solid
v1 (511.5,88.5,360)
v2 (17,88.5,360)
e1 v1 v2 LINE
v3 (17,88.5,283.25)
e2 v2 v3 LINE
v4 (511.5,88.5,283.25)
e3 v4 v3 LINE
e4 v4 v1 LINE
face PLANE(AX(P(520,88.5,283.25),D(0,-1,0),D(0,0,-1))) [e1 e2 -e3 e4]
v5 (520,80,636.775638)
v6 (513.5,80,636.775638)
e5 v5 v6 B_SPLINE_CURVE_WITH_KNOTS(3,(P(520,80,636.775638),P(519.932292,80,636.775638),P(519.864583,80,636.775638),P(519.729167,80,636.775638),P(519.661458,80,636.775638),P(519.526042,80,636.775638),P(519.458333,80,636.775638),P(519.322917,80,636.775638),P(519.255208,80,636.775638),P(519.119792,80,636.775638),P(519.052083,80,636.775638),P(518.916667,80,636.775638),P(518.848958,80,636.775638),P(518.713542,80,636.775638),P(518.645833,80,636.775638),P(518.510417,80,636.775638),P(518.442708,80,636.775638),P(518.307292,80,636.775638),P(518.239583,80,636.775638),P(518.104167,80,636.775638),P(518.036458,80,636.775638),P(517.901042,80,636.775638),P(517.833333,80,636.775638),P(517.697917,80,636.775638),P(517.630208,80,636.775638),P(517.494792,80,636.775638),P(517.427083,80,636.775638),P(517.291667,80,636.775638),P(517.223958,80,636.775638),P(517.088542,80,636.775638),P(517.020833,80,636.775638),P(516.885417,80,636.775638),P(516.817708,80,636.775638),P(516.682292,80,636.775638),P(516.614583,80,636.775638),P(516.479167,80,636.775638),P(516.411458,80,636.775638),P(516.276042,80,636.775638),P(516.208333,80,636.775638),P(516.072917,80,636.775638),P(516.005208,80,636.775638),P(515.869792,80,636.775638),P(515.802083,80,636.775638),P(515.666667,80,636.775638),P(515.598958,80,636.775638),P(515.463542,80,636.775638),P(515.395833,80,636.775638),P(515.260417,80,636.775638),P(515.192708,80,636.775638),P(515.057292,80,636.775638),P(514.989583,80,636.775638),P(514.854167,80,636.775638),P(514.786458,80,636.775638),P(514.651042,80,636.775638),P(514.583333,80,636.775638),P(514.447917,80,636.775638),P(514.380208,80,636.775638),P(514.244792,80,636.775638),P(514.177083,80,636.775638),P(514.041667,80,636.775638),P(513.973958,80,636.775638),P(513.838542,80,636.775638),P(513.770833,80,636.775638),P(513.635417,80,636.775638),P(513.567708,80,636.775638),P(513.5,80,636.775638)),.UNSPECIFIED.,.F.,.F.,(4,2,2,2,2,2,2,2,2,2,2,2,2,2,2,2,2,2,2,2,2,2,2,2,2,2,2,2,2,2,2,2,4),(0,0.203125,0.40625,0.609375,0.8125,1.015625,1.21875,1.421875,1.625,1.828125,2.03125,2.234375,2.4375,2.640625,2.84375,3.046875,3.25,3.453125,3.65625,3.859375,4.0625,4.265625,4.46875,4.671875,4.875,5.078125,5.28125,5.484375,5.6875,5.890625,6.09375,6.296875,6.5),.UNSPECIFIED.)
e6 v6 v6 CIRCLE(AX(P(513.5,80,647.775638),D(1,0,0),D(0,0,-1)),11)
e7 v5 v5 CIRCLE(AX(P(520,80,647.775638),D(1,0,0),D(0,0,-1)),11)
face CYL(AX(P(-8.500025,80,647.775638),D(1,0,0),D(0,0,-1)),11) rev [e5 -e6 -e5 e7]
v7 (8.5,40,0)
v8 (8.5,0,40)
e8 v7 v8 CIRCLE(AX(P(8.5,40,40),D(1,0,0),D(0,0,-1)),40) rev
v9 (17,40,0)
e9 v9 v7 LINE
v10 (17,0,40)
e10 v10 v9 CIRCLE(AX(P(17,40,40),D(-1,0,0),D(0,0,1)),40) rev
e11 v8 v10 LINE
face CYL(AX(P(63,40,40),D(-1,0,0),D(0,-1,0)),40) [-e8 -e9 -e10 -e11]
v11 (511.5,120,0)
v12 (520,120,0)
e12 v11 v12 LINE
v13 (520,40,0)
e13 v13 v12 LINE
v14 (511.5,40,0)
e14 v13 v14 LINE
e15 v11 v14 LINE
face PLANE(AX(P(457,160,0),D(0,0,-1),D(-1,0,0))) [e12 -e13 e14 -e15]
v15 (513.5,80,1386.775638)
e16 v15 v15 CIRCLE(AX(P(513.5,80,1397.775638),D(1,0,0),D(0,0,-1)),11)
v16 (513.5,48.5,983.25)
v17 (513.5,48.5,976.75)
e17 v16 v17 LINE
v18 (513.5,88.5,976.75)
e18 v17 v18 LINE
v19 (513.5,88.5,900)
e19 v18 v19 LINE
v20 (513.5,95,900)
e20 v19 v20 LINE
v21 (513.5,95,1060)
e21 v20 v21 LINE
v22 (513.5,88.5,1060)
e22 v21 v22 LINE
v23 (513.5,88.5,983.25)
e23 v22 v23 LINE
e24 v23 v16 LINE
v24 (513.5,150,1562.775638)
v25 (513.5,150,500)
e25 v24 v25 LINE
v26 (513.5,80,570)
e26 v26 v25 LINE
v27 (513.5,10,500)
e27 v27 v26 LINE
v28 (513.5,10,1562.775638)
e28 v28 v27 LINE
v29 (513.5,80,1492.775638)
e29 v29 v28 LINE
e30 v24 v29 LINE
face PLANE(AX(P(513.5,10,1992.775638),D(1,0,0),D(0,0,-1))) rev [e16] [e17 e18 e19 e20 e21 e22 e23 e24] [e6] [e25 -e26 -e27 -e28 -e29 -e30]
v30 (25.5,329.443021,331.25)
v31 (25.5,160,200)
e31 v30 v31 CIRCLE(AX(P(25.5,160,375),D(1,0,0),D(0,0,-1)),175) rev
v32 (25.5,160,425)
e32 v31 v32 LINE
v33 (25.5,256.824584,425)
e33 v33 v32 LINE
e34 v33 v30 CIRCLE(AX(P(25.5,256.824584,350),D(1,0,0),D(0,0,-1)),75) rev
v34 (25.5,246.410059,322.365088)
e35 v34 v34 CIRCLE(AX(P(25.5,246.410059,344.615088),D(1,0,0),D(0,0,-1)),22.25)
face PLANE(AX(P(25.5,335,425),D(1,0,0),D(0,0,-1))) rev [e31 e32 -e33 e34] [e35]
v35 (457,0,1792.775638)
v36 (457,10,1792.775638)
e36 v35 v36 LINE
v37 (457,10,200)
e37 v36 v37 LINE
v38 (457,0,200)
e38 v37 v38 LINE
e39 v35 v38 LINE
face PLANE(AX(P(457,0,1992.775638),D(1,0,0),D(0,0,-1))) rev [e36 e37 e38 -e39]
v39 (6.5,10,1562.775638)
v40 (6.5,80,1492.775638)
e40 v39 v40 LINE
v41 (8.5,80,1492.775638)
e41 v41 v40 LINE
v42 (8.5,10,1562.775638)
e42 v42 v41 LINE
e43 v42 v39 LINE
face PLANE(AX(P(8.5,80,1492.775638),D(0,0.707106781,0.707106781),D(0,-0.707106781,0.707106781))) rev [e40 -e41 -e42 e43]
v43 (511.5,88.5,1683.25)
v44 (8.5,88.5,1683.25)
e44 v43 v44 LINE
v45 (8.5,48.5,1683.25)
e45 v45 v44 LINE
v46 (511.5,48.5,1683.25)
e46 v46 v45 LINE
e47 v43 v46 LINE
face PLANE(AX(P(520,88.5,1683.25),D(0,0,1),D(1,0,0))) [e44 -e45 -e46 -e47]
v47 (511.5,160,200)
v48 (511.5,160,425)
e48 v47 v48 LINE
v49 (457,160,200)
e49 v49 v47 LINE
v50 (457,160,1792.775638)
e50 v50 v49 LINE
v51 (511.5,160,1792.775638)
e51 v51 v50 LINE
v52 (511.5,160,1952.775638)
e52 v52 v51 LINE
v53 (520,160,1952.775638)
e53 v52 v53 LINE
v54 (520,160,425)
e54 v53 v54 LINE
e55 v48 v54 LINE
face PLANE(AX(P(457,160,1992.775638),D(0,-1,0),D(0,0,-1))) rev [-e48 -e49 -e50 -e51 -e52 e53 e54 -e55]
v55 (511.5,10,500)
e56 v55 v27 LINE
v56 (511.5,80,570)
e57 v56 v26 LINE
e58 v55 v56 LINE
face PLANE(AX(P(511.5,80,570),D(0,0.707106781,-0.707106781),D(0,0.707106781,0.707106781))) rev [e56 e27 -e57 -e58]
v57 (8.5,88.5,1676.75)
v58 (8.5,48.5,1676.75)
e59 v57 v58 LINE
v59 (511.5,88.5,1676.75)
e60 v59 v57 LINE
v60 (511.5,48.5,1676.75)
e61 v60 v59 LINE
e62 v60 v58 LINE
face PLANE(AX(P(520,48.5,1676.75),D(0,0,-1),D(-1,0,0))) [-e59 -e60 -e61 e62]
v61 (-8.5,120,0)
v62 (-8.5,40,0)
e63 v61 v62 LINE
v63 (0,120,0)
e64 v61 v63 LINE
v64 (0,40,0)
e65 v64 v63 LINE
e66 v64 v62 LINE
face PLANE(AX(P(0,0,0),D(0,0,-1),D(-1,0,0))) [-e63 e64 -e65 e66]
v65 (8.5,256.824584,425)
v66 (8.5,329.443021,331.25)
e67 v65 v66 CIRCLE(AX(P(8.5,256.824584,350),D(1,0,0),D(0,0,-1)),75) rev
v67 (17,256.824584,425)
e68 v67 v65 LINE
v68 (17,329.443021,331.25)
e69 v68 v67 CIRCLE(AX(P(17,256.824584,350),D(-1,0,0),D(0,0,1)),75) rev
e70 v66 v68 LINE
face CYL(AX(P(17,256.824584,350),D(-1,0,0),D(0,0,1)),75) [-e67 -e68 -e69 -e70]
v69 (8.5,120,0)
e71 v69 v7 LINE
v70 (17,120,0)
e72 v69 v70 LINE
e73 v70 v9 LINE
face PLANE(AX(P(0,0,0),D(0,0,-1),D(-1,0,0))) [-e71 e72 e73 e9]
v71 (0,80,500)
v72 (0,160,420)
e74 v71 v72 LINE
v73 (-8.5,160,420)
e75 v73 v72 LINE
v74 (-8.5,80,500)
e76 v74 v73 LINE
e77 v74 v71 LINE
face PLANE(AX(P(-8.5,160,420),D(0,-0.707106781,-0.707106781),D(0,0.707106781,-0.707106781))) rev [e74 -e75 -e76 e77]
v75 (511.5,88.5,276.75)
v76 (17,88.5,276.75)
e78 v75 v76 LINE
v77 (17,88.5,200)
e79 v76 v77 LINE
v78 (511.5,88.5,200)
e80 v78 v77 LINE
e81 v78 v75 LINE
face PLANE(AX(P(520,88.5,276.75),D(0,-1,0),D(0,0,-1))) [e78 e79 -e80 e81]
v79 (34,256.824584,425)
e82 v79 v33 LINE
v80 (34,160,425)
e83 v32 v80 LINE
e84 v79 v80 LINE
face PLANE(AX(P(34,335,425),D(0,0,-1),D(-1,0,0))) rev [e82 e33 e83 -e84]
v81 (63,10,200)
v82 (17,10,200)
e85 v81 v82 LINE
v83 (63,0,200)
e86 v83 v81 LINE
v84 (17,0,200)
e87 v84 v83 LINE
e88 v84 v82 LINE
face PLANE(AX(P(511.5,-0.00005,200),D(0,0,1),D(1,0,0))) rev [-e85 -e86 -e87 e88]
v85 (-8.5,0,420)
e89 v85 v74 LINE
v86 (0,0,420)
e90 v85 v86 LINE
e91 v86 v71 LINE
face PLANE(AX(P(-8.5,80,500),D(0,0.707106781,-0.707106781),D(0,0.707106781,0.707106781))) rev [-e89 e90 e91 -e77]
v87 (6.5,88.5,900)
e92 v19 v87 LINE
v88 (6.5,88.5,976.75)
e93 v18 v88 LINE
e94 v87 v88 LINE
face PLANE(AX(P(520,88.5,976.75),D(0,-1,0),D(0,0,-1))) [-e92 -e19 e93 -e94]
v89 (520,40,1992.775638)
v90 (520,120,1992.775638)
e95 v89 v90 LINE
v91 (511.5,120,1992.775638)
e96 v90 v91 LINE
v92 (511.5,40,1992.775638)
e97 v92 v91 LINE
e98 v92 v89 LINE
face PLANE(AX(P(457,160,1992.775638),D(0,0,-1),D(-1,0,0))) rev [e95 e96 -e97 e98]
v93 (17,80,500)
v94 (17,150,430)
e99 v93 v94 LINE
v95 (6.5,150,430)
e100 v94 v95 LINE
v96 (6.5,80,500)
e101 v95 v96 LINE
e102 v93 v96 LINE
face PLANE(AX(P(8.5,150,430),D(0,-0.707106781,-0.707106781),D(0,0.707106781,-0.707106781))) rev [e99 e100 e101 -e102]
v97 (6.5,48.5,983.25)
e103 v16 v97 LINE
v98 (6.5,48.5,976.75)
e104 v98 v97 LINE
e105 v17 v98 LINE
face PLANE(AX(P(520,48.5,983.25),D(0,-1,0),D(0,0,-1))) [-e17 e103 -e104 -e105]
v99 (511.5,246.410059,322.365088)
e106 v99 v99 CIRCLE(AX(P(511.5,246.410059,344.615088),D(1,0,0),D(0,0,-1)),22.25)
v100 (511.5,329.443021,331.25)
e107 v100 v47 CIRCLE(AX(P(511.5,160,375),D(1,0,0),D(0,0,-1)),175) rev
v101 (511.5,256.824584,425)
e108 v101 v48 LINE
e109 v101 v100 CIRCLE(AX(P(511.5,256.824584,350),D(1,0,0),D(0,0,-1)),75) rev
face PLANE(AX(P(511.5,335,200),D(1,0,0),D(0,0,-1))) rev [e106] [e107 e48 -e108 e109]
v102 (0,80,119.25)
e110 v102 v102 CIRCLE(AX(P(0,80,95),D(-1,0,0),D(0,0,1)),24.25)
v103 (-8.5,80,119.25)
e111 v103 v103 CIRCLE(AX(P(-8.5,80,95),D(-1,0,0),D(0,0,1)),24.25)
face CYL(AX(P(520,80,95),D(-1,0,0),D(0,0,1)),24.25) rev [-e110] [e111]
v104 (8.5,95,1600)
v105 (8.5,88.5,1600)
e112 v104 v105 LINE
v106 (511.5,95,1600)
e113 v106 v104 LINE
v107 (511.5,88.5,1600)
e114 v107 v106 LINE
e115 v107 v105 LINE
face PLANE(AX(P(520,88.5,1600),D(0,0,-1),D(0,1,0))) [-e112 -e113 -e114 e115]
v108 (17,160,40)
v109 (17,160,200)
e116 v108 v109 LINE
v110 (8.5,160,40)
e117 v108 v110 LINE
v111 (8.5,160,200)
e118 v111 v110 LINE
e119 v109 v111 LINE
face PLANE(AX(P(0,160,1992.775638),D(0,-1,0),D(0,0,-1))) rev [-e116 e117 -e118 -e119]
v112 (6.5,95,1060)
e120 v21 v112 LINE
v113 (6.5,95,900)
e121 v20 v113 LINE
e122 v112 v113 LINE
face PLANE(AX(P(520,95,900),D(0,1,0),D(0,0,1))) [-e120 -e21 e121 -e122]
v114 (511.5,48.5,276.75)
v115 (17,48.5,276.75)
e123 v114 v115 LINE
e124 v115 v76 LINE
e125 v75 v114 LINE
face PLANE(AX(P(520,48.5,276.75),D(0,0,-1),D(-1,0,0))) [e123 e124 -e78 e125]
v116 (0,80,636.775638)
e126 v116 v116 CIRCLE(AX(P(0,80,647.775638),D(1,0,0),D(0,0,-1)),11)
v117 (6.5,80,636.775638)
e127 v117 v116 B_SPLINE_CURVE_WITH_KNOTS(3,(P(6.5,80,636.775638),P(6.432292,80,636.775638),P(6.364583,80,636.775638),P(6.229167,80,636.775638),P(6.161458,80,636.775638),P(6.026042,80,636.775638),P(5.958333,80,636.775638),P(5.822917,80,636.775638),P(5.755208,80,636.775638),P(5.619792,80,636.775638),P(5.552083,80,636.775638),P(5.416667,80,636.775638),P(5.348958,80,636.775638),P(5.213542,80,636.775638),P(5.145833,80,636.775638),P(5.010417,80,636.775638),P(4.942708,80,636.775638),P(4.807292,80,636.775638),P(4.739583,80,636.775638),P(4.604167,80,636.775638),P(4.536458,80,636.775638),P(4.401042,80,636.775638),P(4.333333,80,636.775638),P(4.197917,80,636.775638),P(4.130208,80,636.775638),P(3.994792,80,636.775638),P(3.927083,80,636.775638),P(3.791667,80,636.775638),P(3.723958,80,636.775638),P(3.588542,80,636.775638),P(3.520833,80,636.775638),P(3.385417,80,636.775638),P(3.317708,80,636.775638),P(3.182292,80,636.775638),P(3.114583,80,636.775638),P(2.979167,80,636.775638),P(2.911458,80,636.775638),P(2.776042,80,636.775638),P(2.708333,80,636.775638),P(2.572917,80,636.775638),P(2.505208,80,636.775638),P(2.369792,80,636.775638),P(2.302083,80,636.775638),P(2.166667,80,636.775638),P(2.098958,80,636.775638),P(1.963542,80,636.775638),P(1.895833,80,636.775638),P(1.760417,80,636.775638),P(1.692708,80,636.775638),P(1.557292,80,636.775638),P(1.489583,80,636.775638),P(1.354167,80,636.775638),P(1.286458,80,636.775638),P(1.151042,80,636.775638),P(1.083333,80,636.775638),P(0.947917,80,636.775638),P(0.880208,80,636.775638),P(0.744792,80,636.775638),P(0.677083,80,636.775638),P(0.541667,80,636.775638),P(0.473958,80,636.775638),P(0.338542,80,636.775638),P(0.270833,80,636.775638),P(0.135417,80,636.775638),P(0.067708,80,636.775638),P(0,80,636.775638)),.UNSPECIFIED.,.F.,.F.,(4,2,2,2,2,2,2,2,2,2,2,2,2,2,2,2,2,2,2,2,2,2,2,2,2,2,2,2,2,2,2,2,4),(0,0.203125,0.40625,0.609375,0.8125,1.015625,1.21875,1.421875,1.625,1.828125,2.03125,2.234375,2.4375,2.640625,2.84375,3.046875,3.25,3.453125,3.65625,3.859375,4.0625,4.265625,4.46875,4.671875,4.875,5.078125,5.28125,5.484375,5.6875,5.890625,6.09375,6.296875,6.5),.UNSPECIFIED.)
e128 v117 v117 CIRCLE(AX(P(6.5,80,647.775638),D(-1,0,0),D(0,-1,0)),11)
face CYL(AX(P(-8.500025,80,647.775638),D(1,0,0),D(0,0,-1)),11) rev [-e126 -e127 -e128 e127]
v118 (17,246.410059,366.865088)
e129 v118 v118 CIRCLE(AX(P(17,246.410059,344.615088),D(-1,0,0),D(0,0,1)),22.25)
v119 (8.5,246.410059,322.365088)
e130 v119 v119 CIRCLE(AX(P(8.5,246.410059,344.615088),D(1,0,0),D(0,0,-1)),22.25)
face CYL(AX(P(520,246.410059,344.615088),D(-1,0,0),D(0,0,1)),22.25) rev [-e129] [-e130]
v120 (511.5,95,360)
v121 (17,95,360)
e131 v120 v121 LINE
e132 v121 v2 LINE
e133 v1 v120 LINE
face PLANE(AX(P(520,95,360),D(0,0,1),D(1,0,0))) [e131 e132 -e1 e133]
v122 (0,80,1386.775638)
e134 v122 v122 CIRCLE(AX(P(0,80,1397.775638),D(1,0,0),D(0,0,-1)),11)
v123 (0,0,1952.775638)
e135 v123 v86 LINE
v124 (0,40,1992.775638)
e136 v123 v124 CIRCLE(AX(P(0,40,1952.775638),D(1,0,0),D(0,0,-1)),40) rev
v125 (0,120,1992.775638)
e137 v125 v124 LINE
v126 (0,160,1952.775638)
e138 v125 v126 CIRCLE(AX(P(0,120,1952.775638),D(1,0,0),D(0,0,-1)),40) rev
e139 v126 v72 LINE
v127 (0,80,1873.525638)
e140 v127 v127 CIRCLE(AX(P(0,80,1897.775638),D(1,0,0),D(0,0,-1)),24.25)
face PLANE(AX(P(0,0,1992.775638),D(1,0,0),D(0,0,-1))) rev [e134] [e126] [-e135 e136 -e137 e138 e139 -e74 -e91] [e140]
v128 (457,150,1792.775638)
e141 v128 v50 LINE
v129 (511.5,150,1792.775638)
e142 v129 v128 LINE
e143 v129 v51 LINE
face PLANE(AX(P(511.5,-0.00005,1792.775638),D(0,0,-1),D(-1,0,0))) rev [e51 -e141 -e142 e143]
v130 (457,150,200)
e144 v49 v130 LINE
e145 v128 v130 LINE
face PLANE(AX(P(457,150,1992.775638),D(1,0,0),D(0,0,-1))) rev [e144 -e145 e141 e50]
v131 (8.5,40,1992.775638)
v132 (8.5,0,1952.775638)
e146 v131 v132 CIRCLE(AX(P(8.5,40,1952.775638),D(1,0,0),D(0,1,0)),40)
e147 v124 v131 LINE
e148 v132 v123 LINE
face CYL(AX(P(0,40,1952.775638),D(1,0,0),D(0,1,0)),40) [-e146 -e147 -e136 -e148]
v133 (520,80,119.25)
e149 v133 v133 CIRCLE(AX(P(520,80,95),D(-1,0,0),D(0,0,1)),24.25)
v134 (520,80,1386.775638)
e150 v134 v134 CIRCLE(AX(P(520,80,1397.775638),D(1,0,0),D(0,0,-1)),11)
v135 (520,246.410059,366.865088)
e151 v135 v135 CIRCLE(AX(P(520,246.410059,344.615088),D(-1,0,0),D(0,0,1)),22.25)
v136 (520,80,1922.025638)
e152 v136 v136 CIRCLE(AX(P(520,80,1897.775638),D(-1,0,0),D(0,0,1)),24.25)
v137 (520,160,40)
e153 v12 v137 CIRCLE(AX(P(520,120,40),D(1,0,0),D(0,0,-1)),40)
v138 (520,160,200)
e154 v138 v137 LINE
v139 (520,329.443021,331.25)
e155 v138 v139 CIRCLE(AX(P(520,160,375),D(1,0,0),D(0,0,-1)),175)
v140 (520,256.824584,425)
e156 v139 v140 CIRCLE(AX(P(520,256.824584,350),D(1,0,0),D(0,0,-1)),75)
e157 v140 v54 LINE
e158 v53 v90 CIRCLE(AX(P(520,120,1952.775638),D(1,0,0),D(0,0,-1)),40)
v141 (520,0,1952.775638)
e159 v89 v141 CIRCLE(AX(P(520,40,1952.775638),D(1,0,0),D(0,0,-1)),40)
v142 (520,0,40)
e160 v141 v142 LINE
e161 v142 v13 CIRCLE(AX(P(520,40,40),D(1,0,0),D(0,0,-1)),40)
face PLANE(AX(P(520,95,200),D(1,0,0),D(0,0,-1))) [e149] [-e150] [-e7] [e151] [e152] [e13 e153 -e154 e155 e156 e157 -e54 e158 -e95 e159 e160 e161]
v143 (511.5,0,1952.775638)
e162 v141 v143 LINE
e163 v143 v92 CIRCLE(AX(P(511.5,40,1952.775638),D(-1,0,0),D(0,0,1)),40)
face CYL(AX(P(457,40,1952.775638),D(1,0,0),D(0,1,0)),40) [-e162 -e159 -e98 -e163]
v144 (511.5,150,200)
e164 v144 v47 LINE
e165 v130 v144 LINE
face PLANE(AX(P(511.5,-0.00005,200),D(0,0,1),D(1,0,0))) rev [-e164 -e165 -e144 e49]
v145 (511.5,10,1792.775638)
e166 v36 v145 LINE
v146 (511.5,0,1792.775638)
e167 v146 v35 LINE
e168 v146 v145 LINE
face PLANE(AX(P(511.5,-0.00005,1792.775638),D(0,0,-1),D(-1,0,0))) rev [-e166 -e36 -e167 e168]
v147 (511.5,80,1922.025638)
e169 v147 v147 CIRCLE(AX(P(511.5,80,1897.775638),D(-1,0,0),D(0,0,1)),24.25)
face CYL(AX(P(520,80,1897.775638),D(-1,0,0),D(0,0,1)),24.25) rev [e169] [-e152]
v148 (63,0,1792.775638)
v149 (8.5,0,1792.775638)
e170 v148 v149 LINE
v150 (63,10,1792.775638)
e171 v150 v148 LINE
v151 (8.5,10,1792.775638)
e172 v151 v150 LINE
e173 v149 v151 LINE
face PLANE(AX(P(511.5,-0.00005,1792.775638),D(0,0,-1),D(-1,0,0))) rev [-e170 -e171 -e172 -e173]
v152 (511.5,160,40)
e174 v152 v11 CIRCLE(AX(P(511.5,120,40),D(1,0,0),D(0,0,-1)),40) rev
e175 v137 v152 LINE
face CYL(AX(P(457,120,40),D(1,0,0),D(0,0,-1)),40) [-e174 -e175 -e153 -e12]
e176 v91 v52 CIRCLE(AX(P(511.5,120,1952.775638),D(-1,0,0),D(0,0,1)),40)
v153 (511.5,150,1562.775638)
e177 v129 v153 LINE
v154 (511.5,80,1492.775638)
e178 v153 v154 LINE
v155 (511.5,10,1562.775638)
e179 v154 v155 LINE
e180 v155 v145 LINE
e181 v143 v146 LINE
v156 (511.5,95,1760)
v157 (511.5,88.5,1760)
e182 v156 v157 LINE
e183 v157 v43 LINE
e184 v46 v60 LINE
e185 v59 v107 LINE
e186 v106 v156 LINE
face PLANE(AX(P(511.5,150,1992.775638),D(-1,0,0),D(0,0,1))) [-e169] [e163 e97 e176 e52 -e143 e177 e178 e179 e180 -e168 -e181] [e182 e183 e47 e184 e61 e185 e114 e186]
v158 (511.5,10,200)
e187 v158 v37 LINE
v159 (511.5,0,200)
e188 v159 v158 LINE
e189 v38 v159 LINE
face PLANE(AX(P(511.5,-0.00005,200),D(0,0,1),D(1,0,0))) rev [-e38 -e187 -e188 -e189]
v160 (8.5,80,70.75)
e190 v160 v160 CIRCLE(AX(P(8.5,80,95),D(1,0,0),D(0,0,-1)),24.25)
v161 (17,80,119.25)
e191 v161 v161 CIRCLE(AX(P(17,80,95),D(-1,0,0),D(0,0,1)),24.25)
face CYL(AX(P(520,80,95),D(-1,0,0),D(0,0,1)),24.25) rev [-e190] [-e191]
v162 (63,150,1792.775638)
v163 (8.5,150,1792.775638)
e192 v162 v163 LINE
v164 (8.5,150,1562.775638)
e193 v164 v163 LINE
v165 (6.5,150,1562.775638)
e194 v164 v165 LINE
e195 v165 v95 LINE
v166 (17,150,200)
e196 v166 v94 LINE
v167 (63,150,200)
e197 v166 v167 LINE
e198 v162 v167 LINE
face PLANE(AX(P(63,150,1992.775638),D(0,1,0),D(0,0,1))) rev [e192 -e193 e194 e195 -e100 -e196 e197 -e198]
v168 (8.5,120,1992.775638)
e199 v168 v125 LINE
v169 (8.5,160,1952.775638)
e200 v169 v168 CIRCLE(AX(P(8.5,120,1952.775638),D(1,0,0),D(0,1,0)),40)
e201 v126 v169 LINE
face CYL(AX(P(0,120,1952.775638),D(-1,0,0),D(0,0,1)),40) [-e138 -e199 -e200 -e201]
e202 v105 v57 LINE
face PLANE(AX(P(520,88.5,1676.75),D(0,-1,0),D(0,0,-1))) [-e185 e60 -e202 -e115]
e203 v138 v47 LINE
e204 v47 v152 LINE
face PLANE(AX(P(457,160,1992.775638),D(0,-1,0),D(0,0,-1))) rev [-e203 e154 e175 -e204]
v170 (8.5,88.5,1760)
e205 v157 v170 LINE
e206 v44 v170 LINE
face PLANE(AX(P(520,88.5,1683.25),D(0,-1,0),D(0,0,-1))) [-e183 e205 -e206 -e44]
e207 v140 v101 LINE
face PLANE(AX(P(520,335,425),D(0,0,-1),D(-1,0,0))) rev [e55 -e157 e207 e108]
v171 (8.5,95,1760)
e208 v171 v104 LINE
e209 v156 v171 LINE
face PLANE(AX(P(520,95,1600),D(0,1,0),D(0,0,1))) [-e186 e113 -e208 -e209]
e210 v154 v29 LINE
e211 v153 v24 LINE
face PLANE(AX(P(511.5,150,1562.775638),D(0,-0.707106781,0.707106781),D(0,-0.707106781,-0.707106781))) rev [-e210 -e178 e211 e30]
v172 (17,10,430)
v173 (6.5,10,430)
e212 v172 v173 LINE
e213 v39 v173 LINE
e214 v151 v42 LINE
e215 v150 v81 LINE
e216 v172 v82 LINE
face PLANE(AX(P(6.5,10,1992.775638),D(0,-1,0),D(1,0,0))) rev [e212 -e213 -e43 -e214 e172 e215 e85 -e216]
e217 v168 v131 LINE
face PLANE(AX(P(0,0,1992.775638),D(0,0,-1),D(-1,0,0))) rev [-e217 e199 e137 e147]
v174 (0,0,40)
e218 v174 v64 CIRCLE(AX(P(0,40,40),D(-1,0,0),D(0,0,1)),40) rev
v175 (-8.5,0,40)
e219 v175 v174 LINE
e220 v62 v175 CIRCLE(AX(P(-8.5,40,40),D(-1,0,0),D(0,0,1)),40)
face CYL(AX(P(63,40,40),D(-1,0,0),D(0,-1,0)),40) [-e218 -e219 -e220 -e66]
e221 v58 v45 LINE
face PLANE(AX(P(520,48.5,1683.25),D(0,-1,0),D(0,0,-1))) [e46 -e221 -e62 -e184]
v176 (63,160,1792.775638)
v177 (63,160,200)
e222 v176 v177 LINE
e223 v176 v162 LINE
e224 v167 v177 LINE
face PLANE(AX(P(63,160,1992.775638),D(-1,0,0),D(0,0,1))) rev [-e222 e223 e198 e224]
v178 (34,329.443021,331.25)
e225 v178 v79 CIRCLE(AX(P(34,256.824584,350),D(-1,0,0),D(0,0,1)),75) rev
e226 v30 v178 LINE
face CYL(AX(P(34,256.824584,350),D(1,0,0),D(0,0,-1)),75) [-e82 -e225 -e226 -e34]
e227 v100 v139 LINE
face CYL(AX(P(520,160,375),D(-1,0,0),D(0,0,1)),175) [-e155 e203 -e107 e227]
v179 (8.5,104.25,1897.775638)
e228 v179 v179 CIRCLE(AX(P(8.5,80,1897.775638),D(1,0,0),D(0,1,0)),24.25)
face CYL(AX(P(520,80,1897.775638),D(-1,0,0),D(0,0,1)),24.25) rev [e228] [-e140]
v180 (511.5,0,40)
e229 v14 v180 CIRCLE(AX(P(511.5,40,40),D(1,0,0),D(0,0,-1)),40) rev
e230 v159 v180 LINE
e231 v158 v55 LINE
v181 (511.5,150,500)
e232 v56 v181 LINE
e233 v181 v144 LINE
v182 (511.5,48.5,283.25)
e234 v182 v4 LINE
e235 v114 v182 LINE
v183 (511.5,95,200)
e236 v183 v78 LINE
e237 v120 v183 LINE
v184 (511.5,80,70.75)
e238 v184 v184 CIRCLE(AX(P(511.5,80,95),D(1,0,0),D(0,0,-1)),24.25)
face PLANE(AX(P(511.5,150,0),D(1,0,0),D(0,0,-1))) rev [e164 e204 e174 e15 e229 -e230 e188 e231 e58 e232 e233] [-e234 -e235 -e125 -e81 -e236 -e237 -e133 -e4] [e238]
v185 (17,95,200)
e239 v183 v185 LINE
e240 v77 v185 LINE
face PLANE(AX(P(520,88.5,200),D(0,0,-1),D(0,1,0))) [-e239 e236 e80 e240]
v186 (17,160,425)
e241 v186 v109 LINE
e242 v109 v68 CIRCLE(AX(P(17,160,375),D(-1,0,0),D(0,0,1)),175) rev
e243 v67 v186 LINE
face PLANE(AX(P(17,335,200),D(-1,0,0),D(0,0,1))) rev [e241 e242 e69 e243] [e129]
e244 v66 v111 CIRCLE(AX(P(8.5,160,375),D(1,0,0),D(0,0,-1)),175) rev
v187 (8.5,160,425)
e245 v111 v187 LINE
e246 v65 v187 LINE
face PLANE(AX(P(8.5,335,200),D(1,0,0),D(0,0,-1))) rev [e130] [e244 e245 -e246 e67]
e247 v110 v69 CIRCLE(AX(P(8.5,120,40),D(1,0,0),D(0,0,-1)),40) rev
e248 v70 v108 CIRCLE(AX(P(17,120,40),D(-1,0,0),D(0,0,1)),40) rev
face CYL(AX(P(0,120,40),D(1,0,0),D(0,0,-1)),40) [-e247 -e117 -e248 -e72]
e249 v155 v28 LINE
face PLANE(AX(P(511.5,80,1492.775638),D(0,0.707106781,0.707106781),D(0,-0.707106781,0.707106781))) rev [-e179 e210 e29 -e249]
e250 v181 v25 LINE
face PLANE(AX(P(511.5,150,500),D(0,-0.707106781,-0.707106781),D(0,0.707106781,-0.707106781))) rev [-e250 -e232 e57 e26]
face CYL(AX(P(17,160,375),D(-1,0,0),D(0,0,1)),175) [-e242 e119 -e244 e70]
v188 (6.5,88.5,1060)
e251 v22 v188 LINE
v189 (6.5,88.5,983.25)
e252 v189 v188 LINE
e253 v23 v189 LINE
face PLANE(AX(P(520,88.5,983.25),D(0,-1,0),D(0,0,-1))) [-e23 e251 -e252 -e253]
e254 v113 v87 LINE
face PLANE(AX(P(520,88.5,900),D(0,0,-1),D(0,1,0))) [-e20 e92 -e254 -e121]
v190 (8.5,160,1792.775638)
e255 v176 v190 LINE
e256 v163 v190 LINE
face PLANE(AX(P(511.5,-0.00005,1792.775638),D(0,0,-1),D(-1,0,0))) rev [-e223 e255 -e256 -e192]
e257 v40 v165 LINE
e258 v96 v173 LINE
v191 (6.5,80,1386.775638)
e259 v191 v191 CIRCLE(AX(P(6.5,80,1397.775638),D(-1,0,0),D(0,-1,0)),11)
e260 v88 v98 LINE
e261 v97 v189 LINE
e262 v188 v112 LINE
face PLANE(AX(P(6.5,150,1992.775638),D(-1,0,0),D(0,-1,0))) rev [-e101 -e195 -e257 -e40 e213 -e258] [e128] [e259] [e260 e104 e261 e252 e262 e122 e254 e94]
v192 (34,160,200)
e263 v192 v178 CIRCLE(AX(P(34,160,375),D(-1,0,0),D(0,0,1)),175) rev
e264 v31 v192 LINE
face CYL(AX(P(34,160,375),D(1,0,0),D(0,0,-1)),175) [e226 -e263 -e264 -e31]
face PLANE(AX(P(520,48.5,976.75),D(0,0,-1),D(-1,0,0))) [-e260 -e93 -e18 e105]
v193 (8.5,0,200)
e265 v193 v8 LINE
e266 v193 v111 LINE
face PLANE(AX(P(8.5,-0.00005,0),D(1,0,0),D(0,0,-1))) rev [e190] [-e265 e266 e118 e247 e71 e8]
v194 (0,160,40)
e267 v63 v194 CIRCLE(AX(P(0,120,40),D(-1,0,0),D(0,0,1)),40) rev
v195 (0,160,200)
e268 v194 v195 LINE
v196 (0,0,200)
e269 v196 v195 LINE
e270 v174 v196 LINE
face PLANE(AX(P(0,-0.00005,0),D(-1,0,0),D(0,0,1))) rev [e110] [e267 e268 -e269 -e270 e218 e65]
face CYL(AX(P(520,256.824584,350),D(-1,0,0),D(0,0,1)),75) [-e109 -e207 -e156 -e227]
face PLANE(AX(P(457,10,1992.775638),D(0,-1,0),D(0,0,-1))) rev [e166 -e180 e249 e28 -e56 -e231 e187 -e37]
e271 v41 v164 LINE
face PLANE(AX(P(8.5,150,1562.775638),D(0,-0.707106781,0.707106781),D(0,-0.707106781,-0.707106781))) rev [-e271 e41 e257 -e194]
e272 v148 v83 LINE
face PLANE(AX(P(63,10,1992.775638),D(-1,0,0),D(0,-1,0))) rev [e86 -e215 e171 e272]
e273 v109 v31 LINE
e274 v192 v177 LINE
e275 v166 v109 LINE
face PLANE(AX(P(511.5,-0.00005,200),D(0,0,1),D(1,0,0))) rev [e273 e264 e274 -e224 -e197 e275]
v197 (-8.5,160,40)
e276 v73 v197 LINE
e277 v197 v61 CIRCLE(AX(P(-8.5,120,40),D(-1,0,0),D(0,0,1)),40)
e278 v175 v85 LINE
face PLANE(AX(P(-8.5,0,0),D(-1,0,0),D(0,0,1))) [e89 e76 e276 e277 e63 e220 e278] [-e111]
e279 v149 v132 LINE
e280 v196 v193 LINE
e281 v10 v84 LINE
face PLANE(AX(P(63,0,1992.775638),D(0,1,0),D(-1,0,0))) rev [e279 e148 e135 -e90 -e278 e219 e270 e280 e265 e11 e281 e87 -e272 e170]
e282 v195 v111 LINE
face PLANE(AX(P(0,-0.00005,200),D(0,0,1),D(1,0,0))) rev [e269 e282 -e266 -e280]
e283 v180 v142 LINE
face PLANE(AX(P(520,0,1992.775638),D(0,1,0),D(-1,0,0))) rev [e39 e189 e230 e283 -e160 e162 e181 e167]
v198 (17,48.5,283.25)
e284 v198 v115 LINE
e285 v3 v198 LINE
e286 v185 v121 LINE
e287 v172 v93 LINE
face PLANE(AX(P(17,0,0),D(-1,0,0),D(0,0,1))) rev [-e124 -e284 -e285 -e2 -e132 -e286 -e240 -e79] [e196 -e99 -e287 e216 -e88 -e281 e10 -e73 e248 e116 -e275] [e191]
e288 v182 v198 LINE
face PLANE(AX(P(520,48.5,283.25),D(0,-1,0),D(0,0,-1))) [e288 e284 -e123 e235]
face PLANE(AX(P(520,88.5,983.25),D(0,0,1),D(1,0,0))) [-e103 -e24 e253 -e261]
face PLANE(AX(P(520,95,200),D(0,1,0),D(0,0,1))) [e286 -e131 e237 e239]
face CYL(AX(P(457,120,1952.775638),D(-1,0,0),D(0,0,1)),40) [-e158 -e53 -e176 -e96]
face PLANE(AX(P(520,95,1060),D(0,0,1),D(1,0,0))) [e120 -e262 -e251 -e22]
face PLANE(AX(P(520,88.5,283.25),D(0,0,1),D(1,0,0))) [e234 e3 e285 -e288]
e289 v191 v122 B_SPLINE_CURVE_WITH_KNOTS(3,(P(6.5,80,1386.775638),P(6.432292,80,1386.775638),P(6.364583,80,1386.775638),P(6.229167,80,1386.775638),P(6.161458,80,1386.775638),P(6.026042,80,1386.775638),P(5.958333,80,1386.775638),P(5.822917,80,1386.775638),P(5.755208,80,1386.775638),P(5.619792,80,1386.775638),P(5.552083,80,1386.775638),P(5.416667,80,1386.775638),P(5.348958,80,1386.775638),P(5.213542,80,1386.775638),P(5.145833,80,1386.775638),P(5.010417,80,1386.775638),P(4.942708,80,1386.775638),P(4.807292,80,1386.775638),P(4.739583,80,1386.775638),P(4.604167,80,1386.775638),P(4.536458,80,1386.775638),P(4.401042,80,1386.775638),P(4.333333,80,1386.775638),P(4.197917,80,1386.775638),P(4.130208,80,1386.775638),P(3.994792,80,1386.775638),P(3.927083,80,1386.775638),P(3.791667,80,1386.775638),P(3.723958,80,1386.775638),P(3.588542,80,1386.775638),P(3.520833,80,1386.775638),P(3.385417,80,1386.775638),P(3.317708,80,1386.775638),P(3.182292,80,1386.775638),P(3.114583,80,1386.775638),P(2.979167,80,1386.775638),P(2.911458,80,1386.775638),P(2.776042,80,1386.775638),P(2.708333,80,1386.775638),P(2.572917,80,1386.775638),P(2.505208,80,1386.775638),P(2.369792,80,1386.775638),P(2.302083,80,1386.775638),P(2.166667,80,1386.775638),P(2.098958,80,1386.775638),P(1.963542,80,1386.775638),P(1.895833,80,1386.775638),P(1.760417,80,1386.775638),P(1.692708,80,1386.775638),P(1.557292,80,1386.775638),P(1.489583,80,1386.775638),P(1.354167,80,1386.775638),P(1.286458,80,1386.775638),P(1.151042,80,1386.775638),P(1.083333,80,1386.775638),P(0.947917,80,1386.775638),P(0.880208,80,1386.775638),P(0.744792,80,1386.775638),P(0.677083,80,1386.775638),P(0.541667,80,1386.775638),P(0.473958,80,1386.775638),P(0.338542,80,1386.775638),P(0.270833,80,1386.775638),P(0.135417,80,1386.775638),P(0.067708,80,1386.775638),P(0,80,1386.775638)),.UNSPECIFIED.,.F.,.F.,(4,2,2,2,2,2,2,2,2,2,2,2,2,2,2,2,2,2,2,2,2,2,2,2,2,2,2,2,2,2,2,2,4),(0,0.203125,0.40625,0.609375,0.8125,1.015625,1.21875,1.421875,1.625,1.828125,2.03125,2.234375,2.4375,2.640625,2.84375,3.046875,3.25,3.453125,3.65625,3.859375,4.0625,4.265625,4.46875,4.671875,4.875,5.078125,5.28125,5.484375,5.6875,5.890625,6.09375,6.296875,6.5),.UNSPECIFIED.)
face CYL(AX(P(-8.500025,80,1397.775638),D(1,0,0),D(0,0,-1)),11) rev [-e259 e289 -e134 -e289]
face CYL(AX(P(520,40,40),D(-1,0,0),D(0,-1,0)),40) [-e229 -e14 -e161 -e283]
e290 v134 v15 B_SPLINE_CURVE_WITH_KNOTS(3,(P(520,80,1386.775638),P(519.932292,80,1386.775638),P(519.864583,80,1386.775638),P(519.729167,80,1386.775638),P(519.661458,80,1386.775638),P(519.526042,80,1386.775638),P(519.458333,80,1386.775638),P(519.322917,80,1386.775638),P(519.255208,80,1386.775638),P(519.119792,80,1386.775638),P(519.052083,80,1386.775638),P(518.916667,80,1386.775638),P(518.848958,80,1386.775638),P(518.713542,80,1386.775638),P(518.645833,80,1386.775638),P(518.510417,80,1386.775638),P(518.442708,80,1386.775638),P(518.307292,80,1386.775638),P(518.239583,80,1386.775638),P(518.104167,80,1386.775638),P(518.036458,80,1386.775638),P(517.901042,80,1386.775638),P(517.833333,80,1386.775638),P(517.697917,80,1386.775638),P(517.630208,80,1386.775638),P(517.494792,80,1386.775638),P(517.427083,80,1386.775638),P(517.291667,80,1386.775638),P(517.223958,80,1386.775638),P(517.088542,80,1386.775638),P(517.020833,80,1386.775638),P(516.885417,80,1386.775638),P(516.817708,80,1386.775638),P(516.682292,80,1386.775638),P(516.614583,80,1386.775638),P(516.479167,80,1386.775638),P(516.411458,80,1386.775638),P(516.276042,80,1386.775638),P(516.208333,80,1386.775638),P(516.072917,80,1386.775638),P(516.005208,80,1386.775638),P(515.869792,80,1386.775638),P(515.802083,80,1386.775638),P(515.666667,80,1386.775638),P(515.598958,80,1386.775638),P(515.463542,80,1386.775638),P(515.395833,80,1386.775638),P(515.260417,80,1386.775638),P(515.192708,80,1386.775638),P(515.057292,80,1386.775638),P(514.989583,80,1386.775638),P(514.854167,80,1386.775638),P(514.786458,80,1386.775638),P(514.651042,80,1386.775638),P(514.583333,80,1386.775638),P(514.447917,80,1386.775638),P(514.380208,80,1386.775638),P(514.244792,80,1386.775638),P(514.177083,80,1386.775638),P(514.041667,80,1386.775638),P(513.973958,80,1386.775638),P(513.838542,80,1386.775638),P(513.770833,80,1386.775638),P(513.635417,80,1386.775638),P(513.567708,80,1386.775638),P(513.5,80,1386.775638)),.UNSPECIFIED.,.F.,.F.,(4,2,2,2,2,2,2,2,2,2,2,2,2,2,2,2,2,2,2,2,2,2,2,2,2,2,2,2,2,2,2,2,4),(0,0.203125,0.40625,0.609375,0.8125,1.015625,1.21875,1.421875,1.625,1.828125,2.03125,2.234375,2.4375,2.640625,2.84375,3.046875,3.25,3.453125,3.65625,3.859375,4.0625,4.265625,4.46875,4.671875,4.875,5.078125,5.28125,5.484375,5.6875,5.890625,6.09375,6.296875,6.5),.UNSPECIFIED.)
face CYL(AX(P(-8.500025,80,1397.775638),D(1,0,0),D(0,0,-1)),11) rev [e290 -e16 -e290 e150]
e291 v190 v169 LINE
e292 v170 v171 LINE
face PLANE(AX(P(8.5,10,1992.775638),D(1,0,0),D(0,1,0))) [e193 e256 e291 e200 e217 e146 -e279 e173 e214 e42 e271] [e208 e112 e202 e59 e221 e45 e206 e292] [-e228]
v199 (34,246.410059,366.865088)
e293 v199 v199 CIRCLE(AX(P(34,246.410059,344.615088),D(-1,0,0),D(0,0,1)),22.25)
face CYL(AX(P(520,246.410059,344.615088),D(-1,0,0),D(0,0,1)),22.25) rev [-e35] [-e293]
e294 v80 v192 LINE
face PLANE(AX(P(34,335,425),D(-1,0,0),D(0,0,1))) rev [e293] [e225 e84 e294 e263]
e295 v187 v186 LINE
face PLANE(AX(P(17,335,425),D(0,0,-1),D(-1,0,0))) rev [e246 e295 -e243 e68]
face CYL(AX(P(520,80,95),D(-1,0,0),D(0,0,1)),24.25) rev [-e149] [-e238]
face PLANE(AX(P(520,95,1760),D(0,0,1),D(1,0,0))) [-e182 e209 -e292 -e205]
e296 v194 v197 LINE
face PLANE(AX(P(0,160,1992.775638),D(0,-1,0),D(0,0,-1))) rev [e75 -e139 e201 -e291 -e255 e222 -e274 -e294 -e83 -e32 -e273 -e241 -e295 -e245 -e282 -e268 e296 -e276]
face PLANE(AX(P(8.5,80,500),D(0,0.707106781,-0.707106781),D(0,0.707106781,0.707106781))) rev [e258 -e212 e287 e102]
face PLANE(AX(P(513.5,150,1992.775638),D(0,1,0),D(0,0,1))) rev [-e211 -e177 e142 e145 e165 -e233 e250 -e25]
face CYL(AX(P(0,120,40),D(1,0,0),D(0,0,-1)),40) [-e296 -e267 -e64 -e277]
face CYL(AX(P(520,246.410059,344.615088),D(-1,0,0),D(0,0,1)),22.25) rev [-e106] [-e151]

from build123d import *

# Parameters (mm, degrees)
EXTRUDE_1_DEPTH        = 1992.775637732
EXTRUDE_1_2_DEPTH      = 1992.775637732
EXTRUDE_3_DEPTH        = 520
PATTERN_LINEAR_1_COUNT = 3
PATTERN_LINEAR_1_PITCH = 700
EXTRUDE_5_DEPTH        = 2
EXTRUDE_8_DEPTH        = 2
EXTRUDE_11_DEPTH       = 8.5
PATTERN_LINEAR_2_COUNT = 2
PATTERN_LINEAR_2_PITCH = 17
SKETCH_6_W             = 494.5
SKETCH_6_H             = 200
SKETCH_6_W_2           = 503
SKETCH_6_W_3           = 8.5
CUT_EXTRUDE_12_DEPTH   = 2066.709258908
SKETCH_20_R            = 24.25
CUT_EXTRUDE_13_DEPTH   = 2068.865322582
FILLET_1_R             = 40
SKETCH_21_W            = 8.5
SKETCH_21_H            = 225
EXTRUDE_14_DEPTH       = 175
SKETCH_22_R            = 22.25
CUT_EXTRUDE_15_DEPTH   = 2089.705817567
FILLET_2_R             = 175
FILLET_3_R             = 75
SKETCH_23_R            = 11
CUT_EXTRUDE_16_DEPTH   = 2089.198879915


with BuildPart() as part:
    # 草图2 → 拉伸1 (new body)
    with BuildSketch(Plane.XY):
        Polygon((0, 0), (0, 160), (63, 160), (63, 150), (6.5, 150), (6.5, 10), (63, 10), (63, 0), align=None)
    extrude(amount=EXTRUDE_1_DEPTH)



with BuildPart() as body_2:
    # 草图2 → Extrude 1 2 (new body)
    with BuildSketch(Plane.XY):
        Polygon((457, 160), (520, 160), (520, 0), (457, 0), (457, 10), (513.5, 10), (513.5, 150), (457, 150), align=None)
    extrude(amount=EXTRUDE_1_2_DEPTH)


with BuildPart() as part_1:
    add(part.part)

    add(body_2.part)  # 拉伸3 merges body 2
    # 草图5 → 拉伸3 (add)
    with BuildSketch(Plane.ZY):
        Polygon((200, 95), (360, 95), (360, 88.5), (283.25, 88.5), (283.25, 48.5), (276.75, 48.5), (276.75, 88.5), (200, 88.5), align=None)
    extrude_3 = extrude(amount=-EXTRUDE_3_DEPTH)

    # 阵列(线性)1: 拉伸3 ×3
    with Locations(*[(0, 0, i * PATTERN_LINEAR_1_PITCH) for i in range(1, PATTERN_LINEAR_1_COUNT)]):
        add(extrude_3)

    # 草图7 → 拉伸5 (add)
    with BuildSketch(Plane.ZY.offset(-513.5)):
        Polygon((0, 10), (500, 10), (570, 80), (500, 150), (0, 150), align=None)
        Polygon((1562.775637732, 150), (1492.775637732, 80), (1562.775637732, 10), (1992.775637732, 10), (1992.775637732, 150), align=None)
    extrude(amount=EXTRUDE_5_DEPTH)

    # 草图15 → 拉伸8 (add)
    with BuildSketch(Plane(origin=(6.5, 0, 0), x_dir=(0, 0, -1), z_dir=(1, 0, 0))):
        Polygon((-1992.775637732, 150), (-1562.775637732, 150), (-1492.775637732, 80), (-1562.775637732, 10), (-1992.775637732, 10), align=None)
        Polygon((-430, 150), (0, 150), (0, 10), (-430, 10), (-500, 80), align=None)
    extrude(amount=EXTRUDE_8_DEPTH)

    # 草图19 → 拉伸11 (add)
    with BuildSketch(Plane.ZY):
        Polygon((0, 160), (420, 160), (500, 80), (420, 0), (0, 0), align=None)
    extrude_11 = extrude(amount=EXTRUDE_11_DEPTH)

    # 阵列(线性)2: 拉伸11 ×2
    with Locations(*[(i * PATTERN_LINEAR_2_PITCH, 0, 0) for i in range(1, PATTERN_LINEAR_2_COUNT)]):
        add(extrude_11)

    # 草图6 → 拉伸12 (cut, through all)
    with BuildSketch(Plane(origin=(0, 160, 0), x_dir=(1, 0, 0), z_dir=(0, 1, 0))):
        with Locations((264.25, -100)):
            Rectangle(SKETCH_6_W, SKETCH_6_H)
        with Locations((260, -1892.775637732)):
            Rectangle(SKETCH_6_W_2, SKETCH_6_H)
        with Locations((4.25, -100)):
            Rectangle(SKETCH_6_W_3, SKETCH_6_H)
    extrude(amount=-CUT_EXTRUDE_12_DEPTH, mode=Mode.SUBTRACT)

    # 草图20 → 拉伸13 (cut, through all)
    with BuildSketch(Plane.ZY.offset(8.5)):
        with Locations((95, 80)):
            Circle(SKETCH_20_R)
        with Locations(Location((1897.775637732, 80, 0), (0, 0, 90))):
            Circle(SKETCH_20_R)
    extrude(amount=-CUT_EXTRUDE_13_DEPTH, mode=Mode.SUBTRACT)

    # 圆角1
    fillet_1_edges = [part_1.edges().sort_by_distance(p)[0] for p in [
        (4.25, 0, 1992.775637732),
        (4.25, 160, 1992.775637732),
        (515.75, 0, 1992.775637732),
        (515.75, 160, 1992.775637732),
        (-4.25, 0, 0),
        (12.75, 0, 0),
        (-4.25, 160, 0),
        (12.75, 160, 0),
        (515.75, 0, 0),
        (515.75, 160, 0),
    ]]
    fillet(fillet_1_edges, radius=FILLET_1_R)

    # 草图21 → 拉伸14 (add)
    with BuildSketch(Plane(origin=(0, 160, 0), x_dir=(1, 0, 0), z_dir=(0, 1, 0))):
        with Locations((515.75, -312.5)):
            Rectangle(SKETCH_21_W, SKETCH_21_H)
        with Locations((12.75, -312.5)):
            Rectangle(SKETCH_21_W, SKETCH_21_H)
        with Locations((29.75, -312.5)):
            Rectangle(SKETCH_21_W, SKETCH_21_H)
    extrude(amount=EXTRUDE_14_DEPTH)

    # 草图22 → 拉伸15 (cut, through all)
    with BuildSketch(Plane.ZY.offset(8.5)):
        with Locations((344.615088301, 246.410058868)):
            Circle(SKETCH_22_R)
    extrude(amount=-CUT_EXTRUDE_15_DEPTH, mode=Mode.SUBTRACT)

    # 圆角2
    fillet_2_edges = [part_1.edges().sort_by_distance(p)[0] for p in [
        (12.75, 335, 200),
        (515.75, 335, 200),
        (29.75, 335, 200),
    ]]
    fillet(fillet_2_edges, radius=FILLET_2_R - 0.0001)  # a hair under: the kernel refuses the full size

    # 圆角3
    fillet_3_edges = [part_1.edges().sort_by_distance(p)[0] for p in [
        (12.75, 335, 425),
        (515.75, 335, 425),
        (29.75, 335, 425),
    ]]
    fillet(fillet_3_edges, radius=FILLET_3_R)

    # 草图23 → 拉伸16 (cut, through all)
    with BuildSketch(Plane(origin=(520, 0, 0), x_dir=(0, 0, -1), z_dir=(1, 0, 0))):
        with Locations((-1397.775637732, 80)):
            Circle(SKETCH_23_R)
        with Locations((-647.775637732, 80)):
            Circle(SKETCH_23_R)
    extrude(amount=-CUT_EXTRUDE_16_DEPTH, mode=Mode.SUBTRACT)


solid = part_1.part
